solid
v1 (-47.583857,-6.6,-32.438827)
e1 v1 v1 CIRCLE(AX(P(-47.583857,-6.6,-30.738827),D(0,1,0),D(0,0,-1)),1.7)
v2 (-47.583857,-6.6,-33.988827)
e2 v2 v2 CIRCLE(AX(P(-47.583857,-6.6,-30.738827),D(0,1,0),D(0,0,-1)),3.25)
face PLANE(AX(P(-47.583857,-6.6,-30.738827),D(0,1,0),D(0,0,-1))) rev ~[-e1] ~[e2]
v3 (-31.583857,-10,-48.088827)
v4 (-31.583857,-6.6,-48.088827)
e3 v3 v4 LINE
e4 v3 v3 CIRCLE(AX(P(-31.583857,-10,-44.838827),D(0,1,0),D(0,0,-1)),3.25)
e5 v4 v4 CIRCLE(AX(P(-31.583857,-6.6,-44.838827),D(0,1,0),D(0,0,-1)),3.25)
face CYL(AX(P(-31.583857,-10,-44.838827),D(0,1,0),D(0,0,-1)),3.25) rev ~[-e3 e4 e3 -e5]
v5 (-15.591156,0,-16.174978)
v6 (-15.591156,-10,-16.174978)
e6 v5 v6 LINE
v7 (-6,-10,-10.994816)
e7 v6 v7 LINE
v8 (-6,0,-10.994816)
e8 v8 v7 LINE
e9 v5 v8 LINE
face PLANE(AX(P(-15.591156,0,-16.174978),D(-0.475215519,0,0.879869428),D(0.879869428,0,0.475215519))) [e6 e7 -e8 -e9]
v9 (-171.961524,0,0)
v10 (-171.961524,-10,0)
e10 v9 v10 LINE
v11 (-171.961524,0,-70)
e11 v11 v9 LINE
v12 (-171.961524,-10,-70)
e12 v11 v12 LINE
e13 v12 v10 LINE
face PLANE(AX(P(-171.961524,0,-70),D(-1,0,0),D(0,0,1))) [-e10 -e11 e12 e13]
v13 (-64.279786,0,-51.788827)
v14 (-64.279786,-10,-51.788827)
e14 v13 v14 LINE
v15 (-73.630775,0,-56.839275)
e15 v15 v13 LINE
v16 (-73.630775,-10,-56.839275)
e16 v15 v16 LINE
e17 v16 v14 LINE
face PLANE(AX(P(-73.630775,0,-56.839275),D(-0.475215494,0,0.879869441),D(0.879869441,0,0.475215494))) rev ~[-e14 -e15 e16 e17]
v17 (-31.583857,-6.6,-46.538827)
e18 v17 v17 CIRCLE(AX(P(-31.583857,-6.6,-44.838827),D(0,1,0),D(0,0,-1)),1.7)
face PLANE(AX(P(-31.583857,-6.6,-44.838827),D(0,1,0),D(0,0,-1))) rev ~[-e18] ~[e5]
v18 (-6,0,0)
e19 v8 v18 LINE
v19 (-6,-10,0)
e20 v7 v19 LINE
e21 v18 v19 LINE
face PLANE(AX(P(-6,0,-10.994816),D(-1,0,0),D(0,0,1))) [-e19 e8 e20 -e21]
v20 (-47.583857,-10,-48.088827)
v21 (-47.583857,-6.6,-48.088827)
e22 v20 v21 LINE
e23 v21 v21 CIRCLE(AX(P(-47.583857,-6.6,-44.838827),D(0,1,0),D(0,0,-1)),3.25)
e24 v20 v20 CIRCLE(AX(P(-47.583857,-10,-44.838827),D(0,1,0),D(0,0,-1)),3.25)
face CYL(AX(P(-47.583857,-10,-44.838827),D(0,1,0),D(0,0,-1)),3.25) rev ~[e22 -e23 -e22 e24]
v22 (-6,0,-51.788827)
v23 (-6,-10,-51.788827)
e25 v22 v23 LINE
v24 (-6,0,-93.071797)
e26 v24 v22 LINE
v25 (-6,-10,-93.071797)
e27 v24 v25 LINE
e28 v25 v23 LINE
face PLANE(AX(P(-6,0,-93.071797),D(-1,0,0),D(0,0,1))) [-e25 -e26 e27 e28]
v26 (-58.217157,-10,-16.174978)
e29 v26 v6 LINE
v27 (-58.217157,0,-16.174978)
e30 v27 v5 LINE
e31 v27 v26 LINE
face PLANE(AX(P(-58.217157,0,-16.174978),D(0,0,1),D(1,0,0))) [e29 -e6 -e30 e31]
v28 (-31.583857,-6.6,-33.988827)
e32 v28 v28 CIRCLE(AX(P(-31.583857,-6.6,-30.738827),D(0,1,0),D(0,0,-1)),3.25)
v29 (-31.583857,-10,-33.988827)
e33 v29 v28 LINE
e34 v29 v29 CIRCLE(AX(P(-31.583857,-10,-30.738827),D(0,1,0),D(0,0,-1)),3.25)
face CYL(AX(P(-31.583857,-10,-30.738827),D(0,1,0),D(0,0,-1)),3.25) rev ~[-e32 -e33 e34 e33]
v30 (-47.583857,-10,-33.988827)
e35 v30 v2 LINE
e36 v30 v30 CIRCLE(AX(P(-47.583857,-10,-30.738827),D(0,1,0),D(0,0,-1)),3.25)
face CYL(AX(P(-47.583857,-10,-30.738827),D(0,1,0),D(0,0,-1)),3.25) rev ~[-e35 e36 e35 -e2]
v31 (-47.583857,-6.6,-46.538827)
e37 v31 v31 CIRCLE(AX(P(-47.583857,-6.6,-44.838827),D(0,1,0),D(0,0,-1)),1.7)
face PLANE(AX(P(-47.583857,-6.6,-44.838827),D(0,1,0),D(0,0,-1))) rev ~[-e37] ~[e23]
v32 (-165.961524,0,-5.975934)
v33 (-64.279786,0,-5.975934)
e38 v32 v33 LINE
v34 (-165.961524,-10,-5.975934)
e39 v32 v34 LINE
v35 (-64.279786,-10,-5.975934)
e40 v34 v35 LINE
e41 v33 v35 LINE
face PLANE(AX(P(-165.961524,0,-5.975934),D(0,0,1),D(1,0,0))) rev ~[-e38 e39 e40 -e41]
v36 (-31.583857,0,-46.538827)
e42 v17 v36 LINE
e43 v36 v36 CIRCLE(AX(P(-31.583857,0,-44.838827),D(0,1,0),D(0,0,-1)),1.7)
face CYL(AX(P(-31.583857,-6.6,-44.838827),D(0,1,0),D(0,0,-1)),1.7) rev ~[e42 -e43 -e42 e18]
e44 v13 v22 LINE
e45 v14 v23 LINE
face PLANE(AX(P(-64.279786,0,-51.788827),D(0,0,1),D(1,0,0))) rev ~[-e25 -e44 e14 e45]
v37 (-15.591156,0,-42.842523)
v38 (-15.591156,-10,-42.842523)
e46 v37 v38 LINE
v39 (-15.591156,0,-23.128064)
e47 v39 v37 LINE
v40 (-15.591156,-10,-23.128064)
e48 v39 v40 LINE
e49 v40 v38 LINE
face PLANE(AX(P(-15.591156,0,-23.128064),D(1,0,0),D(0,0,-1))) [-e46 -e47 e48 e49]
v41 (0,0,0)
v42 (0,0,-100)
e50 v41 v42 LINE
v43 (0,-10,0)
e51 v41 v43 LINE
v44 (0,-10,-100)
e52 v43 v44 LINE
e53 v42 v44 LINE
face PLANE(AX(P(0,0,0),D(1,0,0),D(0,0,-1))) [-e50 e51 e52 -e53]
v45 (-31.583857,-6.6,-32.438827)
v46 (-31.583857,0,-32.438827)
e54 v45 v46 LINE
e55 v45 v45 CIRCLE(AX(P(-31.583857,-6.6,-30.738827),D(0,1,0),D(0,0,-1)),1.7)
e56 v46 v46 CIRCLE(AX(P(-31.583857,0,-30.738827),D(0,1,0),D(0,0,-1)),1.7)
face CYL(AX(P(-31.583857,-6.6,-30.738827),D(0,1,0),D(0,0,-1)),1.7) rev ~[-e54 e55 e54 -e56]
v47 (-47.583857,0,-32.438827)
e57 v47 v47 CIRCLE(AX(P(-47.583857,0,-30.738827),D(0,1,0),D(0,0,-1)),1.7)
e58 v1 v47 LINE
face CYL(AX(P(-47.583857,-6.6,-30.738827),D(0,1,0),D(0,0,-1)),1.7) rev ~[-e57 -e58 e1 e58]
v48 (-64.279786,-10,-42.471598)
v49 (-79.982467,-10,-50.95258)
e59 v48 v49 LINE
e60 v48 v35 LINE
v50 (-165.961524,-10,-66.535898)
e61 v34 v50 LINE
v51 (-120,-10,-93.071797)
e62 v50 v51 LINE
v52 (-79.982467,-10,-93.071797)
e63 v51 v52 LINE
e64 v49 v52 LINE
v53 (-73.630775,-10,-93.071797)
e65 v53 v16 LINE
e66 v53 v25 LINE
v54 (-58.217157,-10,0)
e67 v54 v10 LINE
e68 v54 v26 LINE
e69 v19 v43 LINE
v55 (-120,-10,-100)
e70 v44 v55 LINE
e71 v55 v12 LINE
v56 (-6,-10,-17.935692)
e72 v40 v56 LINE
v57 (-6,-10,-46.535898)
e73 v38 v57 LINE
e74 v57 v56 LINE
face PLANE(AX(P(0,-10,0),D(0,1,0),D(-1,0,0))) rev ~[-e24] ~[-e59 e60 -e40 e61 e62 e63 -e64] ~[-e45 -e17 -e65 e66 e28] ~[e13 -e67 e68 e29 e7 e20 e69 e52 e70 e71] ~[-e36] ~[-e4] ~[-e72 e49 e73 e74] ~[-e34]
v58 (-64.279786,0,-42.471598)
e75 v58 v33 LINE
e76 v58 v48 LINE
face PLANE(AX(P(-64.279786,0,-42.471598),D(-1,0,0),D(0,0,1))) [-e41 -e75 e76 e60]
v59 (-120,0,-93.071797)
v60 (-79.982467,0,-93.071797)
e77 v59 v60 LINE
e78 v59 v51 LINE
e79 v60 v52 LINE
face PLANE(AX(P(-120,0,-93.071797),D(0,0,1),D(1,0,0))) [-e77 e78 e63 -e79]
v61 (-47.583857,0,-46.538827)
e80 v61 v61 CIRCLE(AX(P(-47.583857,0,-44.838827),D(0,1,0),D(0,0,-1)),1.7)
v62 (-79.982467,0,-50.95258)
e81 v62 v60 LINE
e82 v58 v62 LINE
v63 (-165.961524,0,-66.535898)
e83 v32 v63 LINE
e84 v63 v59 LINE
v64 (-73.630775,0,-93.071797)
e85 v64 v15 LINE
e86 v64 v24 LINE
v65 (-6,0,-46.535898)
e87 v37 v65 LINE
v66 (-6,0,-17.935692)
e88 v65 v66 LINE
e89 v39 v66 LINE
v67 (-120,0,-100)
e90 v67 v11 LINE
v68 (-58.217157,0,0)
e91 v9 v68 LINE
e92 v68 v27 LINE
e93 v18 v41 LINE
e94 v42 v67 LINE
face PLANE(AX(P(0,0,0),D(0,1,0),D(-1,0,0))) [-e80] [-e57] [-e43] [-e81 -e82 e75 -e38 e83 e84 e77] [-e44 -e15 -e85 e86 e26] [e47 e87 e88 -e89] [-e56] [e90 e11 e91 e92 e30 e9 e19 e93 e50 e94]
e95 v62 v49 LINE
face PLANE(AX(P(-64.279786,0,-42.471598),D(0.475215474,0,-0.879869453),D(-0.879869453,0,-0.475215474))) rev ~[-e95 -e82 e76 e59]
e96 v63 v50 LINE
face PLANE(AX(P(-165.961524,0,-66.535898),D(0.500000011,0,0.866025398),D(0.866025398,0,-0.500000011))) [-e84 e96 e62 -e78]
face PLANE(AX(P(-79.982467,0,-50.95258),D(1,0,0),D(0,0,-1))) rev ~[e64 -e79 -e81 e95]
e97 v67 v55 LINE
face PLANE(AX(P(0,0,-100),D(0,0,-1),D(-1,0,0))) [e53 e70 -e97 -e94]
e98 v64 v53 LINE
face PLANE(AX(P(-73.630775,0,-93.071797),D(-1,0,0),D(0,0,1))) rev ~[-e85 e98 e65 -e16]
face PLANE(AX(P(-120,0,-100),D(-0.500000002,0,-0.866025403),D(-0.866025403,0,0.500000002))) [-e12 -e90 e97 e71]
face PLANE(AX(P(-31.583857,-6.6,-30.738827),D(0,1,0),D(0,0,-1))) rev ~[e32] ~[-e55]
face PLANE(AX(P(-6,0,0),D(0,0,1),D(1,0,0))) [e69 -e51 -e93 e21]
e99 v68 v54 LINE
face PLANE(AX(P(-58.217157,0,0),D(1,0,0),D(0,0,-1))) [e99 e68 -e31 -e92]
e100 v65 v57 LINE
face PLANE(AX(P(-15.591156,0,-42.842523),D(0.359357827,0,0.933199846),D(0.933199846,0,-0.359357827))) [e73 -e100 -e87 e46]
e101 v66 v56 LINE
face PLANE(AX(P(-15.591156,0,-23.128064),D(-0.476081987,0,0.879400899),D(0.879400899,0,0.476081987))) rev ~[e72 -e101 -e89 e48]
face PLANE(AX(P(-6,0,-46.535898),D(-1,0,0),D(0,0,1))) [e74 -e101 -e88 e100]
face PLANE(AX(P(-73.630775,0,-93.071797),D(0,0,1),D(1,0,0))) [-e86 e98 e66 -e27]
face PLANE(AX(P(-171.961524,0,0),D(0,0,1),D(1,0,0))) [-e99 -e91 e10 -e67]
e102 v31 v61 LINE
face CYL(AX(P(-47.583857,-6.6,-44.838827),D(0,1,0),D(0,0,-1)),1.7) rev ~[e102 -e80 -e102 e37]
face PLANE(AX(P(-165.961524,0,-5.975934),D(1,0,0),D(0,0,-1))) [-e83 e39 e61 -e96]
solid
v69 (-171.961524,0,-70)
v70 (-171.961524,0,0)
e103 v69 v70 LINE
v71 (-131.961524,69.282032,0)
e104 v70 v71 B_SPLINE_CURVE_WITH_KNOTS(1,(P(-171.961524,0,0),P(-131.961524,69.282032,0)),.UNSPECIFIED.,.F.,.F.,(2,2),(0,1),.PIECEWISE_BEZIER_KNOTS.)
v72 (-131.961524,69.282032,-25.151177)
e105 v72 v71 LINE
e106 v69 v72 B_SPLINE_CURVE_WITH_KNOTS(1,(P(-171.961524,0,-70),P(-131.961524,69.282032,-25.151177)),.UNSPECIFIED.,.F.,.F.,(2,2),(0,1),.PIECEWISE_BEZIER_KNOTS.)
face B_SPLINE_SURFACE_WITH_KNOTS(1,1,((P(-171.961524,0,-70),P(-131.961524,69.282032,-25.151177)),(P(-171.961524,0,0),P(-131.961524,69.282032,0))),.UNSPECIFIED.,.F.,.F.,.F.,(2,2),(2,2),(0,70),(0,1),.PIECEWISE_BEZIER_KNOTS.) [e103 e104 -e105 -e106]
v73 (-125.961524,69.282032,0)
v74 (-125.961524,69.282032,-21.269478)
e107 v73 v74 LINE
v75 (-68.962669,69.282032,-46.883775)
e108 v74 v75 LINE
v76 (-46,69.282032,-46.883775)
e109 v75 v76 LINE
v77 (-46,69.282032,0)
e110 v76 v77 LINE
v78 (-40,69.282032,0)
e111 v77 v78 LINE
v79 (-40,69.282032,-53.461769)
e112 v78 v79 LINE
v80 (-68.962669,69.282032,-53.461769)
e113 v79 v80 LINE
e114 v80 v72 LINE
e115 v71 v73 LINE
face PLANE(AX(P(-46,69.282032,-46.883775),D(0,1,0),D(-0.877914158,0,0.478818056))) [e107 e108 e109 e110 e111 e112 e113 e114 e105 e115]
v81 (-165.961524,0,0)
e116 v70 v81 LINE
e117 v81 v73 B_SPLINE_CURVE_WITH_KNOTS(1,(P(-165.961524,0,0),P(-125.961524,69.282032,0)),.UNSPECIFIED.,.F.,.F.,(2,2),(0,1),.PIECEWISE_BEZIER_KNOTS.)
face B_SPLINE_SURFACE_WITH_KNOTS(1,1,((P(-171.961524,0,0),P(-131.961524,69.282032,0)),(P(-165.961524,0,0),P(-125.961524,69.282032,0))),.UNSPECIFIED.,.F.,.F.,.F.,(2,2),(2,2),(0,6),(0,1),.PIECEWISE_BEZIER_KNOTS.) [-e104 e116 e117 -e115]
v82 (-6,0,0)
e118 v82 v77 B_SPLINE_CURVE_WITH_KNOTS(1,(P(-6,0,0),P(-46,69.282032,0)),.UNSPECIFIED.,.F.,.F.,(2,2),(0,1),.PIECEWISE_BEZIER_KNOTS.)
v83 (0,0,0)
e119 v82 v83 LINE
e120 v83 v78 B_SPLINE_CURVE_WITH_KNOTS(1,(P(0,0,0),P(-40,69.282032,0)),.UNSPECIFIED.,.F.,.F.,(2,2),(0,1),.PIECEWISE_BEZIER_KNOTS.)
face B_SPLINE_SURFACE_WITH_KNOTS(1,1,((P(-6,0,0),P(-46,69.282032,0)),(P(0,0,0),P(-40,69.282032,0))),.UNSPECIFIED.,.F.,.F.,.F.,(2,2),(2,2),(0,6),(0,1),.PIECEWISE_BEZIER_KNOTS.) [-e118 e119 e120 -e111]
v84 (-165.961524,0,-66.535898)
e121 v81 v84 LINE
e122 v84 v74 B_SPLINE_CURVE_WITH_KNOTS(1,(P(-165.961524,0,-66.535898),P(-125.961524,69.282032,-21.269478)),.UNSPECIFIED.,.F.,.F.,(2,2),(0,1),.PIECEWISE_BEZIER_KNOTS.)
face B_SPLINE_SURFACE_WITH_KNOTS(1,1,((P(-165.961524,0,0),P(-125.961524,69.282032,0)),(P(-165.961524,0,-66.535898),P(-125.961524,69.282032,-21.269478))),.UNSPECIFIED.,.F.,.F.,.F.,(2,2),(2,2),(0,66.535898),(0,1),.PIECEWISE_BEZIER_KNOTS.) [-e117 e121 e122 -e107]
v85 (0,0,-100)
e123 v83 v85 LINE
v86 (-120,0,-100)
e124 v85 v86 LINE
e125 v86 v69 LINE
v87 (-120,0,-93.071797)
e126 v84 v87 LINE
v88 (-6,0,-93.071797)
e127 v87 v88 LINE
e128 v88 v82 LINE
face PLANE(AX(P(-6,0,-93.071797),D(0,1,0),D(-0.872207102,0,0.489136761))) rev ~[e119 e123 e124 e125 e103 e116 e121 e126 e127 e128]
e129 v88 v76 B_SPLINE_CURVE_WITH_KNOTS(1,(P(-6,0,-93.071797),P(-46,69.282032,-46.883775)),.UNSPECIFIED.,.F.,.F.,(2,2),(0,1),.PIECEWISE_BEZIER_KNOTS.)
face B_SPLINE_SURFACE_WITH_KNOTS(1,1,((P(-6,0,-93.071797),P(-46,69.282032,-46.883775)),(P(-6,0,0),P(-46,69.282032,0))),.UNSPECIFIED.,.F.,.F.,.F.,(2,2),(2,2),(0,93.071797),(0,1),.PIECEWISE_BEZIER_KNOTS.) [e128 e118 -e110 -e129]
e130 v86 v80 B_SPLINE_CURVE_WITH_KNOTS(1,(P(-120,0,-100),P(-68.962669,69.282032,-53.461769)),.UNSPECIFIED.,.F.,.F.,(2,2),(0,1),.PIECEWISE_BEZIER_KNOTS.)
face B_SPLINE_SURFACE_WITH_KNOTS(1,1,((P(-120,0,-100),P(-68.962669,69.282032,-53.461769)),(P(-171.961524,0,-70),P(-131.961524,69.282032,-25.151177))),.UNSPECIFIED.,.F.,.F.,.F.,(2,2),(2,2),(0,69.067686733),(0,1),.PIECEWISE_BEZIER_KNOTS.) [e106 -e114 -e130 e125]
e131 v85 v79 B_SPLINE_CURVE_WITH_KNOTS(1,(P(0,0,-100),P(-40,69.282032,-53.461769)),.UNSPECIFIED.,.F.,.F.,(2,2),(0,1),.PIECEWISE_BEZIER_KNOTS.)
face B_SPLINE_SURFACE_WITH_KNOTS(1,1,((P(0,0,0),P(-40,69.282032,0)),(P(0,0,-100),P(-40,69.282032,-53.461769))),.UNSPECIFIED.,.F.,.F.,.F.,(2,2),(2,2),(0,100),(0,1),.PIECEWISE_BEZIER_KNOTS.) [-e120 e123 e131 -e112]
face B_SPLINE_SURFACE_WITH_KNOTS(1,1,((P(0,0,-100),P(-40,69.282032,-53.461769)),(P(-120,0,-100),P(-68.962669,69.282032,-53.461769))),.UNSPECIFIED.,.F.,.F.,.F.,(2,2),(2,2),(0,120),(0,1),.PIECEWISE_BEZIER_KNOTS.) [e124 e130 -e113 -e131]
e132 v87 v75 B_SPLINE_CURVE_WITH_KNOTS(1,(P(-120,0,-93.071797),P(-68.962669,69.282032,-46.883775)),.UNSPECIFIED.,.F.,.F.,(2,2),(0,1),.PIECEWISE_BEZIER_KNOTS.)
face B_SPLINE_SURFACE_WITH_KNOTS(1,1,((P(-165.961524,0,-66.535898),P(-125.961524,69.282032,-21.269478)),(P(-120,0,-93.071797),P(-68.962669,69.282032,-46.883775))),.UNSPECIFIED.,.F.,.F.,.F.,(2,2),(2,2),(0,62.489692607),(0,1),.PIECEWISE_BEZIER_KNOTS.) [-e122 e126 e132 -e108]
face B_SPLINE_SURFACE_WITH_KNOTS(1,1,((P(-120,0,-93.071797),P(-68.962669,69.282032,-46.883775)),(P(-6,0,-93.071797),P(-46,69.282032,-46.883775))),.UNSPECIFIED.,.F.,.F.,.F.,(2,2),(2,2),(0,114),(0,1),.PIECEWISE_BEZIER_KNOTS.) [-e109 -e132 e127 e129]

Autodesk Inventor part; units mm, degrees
ref_plane "YZ Plane" through (0, 0, 0) normal (1, 0, 0) x (0, 1, 0)
ref_plane "XZ Plane" through (0, 0, 0) normal (0, 1, 0) x (-1, 0, 0)
sketch "Base Sketch" plane through (0, 0, 0) normal (0, 1, 0) x (-1, 0, 0)
  line L0 (0, 0) -> (0, -100)
  line L1 (0, -100) -> (120, -100)
  line L2 (120, -100) -> (171.961524, -70)
  line L3 (171.961524, -70) -> (171.961524, 0)
  line L4 (171.961524, 0) -> (0, 0)
  line L5 (165.961524, 0) -> (165.961524, -66.535898)
  line L6 (165.961524, -66.535898) -> (120, -93.071797)
  line L7 (142.980762, -79.803848) -> (145.980762, -85) construction
  line L8 (165.961524, -66.535898) -> (171.961524, -66.535898) construction
  line L9 (120, -93.071797) -> (6, -93.071797)
  line L10 (6, -93.071797) -> (6, 0)
  line L11 (6, -93.071797) -> (0, -93.071797) construction
  line L12 (120, -93.071797) -> (6, -93.071797)
  line L13 (6, -93.071797) -> (6, -50.829914)
  line L14 (64.279786, -42.471598) -> (64.279786, 0)
  line L15 (64.279786, -42.471598) -> (79.982467, -50.95258)
  line L16 (79.982467, -50.95258) -> (79.982467, -93.071797)
  line L17 (73.630775, -93.071797) -> (73.630775, -56.839275)
  line L18 (73.630775, -56.839275) -> (64.279786, -51.788827)
  line L19 (64.279786, -51.788827) -> (6, -51.788827)
  line L20 (15.591156, -23.128064) -> (15.591156, -42.842523)
  line L21 (15.591156, -42.842523) -> (6, -46.535898)
  line L22 (165.961524, -5.975934) -> (64.279786, -5.975934)
  line L23 (58.217157, 0) -> (58.217157, -16.174978)
  line L24 (58.217157, -16.174978) -> (15.591156, -16.174978)
  line L25 (15.591156, -23.128064) -> (6, -17.935692)
  line L26 (15.591156, -16.174978) -> (6, -10.994816)
  dimension "d0" = 100
  dimension "d1" = 120
  dimension "d3" = 60
  dimension "d4" = 120
  dimension "d5" = 6
sketch3d "3D Scaffold Sketch"
ref_plane "Ceiling" through (-46, 69.282032, -46.883775) normal (0, 1, 0) x (0, 0, 1)
sketch "Ceiling Sketch" plane through (-46, 69.282032, -46.883775) normal (0, 1, 0) x (0, 0, 1)
  line L0 (46.883775, -79.961524) -> (46.883775, 0)
  line L1 (0, 0) -> (46.883775, 0)
  line L2 (0, -22.962669) -> (0, 0)
  line L3 (0, -22.962669) -> (25.614297, -79.961524)
  line L4 (46.883775, -79.961524) -> (25.614297, -79.961524)
  line L5 (46.883775, 0) -> (46.883775, 6)
  line L6 (46.883775, 6) -> (-6.577994, 6)
  line L7 (-6.577994, 6) -> (-6.577994, -22.962669)
  line L8 (-6.577994, -22.962669) -> (21.732598, -85.961524)
  line L9 (21.732598, -85.961524) -> (46.883775, -85.961524)
  line L10 (46.883775, -85.961524) -> (46.883775, -79.961524)
  line L11 (-19.652123, -119.961524) -> (-19.652123, -125.961524) construction
  line L12 (12.807148, -51.462096) -> (7.334356, -53.921474) construction
  point P0 (46.883775, 46)
sketch3d "3D Scaffold Finish Sketch"
sketch "Base Sketch outline for Loft1" plane through (0, 0, 0) normal (0, 1, 0) x (-1, 0, 0)
  line L0 (6, 0) -> (0, 0)
  line L1 (6, -93.071797) -> (6, 0)
  line L2 (120, -93.071797) -> (6, -93.071797)
  line L3 (165.961524, -66.535898) -> (120, -93.071797)
  line L4 (165.961524, 0) -> (165.961524, -66.535898)
  line L5 (171.961524, 0) -> (165.961524, 0)
  line L6 (171.961524, -70) -> (171.961524, 0)
  line L7 (120, -100) -> (171.961524, -70)
  line L8 (0, -100) -> (120, -100)
  line L9 (0, 0) -> (0, -100)
sketch "Ceiling Sketch outline for Loft1" plane through (-46, 69.282032, -46.883775) normal (0, 1, 0) x (0, 0, 1)
  line L0 (46.883775, -85.961524) -> (46.883775, -79.961524)
  line L1 (21.732598, -85.961524) -> (46.883775, -85.961524)
  line L2 (-6.577994, -22.962669) -> (21.732598, -85.961524)
  line L3 (-6.577994, 6) -> (-6.577994, -22.962669)
  line L4 (46.883775, 6) -> (-6.577994, 6)
  line L5 (46.883775, 0) -> (46.883775, 6)
  line L6 (0, 0) -> (46.883775, 0)
  line L7 (0, -22.962669) -> (0, 0)
  line L8 (25.614297, -79.961524) -> (0, -22.962669)
  line L9 (46.883775, -79.961524) -> (25.614297, -79.961524)
loft "Loft1" add profiles "Base Sketch outline for Loft1", "Ceiling Sketch outline for Loft1"
extrude "Base Extrusion" add sketch "Base Sketch" against normal blind 10 separate body contours L4 L10 L9 L6 L5 L3 L2 L1 L0 | L4 L14 L15 L16 L9 L17 L18 L19 L10 L21 L20 L25 L26 L24 L23 | L4 L5 L22 L14
sketch "Sketch4" plane through (0, -10, 0) normal (0, -1, 0) x (1, 0, 0)
  line L0 (-47.583857, -30.738827) -> (-31.583857, -30.738827) construction
  line L1 (-31.583857, -30.738827) -> (-31.583857, -44.838827) construction
  line L2 (-31.583857, -44.838827) -> (-47.583857, -44.838827) construction
  line L3 (-47.583857, -44.838827) -> (-47.583857, -30.738827) construction
  line L4 (-39.583857, -44.838827) -> (-39.583857, -30.738827) construction
  line L5 (-47.583857, -37.788827) -> (-31.583857, -37.788827) construction
  line L6 (-64.279786, -51.788827) -> (-6, -51.788827)
  point P0 (0, 0)
  dimension "d42" = 14.1
  dimension "d43" = 16
  dimension "d45" = 14
hole "Hole1" at (-47.583857, -10, -30.738827) at (-47.583857, -10, -44.838827) at (-31.583857, -10, -30.738827) at (-31.583857, -10, -44.838827) direction (0, 1, 0) diameter 3.4 end through all counterbore diameter 6.5 counterbore depth 3.4 bodies 2 clearance for "Socket Head Cap Screw ISO 4762" size "M3" standard "ISO"
